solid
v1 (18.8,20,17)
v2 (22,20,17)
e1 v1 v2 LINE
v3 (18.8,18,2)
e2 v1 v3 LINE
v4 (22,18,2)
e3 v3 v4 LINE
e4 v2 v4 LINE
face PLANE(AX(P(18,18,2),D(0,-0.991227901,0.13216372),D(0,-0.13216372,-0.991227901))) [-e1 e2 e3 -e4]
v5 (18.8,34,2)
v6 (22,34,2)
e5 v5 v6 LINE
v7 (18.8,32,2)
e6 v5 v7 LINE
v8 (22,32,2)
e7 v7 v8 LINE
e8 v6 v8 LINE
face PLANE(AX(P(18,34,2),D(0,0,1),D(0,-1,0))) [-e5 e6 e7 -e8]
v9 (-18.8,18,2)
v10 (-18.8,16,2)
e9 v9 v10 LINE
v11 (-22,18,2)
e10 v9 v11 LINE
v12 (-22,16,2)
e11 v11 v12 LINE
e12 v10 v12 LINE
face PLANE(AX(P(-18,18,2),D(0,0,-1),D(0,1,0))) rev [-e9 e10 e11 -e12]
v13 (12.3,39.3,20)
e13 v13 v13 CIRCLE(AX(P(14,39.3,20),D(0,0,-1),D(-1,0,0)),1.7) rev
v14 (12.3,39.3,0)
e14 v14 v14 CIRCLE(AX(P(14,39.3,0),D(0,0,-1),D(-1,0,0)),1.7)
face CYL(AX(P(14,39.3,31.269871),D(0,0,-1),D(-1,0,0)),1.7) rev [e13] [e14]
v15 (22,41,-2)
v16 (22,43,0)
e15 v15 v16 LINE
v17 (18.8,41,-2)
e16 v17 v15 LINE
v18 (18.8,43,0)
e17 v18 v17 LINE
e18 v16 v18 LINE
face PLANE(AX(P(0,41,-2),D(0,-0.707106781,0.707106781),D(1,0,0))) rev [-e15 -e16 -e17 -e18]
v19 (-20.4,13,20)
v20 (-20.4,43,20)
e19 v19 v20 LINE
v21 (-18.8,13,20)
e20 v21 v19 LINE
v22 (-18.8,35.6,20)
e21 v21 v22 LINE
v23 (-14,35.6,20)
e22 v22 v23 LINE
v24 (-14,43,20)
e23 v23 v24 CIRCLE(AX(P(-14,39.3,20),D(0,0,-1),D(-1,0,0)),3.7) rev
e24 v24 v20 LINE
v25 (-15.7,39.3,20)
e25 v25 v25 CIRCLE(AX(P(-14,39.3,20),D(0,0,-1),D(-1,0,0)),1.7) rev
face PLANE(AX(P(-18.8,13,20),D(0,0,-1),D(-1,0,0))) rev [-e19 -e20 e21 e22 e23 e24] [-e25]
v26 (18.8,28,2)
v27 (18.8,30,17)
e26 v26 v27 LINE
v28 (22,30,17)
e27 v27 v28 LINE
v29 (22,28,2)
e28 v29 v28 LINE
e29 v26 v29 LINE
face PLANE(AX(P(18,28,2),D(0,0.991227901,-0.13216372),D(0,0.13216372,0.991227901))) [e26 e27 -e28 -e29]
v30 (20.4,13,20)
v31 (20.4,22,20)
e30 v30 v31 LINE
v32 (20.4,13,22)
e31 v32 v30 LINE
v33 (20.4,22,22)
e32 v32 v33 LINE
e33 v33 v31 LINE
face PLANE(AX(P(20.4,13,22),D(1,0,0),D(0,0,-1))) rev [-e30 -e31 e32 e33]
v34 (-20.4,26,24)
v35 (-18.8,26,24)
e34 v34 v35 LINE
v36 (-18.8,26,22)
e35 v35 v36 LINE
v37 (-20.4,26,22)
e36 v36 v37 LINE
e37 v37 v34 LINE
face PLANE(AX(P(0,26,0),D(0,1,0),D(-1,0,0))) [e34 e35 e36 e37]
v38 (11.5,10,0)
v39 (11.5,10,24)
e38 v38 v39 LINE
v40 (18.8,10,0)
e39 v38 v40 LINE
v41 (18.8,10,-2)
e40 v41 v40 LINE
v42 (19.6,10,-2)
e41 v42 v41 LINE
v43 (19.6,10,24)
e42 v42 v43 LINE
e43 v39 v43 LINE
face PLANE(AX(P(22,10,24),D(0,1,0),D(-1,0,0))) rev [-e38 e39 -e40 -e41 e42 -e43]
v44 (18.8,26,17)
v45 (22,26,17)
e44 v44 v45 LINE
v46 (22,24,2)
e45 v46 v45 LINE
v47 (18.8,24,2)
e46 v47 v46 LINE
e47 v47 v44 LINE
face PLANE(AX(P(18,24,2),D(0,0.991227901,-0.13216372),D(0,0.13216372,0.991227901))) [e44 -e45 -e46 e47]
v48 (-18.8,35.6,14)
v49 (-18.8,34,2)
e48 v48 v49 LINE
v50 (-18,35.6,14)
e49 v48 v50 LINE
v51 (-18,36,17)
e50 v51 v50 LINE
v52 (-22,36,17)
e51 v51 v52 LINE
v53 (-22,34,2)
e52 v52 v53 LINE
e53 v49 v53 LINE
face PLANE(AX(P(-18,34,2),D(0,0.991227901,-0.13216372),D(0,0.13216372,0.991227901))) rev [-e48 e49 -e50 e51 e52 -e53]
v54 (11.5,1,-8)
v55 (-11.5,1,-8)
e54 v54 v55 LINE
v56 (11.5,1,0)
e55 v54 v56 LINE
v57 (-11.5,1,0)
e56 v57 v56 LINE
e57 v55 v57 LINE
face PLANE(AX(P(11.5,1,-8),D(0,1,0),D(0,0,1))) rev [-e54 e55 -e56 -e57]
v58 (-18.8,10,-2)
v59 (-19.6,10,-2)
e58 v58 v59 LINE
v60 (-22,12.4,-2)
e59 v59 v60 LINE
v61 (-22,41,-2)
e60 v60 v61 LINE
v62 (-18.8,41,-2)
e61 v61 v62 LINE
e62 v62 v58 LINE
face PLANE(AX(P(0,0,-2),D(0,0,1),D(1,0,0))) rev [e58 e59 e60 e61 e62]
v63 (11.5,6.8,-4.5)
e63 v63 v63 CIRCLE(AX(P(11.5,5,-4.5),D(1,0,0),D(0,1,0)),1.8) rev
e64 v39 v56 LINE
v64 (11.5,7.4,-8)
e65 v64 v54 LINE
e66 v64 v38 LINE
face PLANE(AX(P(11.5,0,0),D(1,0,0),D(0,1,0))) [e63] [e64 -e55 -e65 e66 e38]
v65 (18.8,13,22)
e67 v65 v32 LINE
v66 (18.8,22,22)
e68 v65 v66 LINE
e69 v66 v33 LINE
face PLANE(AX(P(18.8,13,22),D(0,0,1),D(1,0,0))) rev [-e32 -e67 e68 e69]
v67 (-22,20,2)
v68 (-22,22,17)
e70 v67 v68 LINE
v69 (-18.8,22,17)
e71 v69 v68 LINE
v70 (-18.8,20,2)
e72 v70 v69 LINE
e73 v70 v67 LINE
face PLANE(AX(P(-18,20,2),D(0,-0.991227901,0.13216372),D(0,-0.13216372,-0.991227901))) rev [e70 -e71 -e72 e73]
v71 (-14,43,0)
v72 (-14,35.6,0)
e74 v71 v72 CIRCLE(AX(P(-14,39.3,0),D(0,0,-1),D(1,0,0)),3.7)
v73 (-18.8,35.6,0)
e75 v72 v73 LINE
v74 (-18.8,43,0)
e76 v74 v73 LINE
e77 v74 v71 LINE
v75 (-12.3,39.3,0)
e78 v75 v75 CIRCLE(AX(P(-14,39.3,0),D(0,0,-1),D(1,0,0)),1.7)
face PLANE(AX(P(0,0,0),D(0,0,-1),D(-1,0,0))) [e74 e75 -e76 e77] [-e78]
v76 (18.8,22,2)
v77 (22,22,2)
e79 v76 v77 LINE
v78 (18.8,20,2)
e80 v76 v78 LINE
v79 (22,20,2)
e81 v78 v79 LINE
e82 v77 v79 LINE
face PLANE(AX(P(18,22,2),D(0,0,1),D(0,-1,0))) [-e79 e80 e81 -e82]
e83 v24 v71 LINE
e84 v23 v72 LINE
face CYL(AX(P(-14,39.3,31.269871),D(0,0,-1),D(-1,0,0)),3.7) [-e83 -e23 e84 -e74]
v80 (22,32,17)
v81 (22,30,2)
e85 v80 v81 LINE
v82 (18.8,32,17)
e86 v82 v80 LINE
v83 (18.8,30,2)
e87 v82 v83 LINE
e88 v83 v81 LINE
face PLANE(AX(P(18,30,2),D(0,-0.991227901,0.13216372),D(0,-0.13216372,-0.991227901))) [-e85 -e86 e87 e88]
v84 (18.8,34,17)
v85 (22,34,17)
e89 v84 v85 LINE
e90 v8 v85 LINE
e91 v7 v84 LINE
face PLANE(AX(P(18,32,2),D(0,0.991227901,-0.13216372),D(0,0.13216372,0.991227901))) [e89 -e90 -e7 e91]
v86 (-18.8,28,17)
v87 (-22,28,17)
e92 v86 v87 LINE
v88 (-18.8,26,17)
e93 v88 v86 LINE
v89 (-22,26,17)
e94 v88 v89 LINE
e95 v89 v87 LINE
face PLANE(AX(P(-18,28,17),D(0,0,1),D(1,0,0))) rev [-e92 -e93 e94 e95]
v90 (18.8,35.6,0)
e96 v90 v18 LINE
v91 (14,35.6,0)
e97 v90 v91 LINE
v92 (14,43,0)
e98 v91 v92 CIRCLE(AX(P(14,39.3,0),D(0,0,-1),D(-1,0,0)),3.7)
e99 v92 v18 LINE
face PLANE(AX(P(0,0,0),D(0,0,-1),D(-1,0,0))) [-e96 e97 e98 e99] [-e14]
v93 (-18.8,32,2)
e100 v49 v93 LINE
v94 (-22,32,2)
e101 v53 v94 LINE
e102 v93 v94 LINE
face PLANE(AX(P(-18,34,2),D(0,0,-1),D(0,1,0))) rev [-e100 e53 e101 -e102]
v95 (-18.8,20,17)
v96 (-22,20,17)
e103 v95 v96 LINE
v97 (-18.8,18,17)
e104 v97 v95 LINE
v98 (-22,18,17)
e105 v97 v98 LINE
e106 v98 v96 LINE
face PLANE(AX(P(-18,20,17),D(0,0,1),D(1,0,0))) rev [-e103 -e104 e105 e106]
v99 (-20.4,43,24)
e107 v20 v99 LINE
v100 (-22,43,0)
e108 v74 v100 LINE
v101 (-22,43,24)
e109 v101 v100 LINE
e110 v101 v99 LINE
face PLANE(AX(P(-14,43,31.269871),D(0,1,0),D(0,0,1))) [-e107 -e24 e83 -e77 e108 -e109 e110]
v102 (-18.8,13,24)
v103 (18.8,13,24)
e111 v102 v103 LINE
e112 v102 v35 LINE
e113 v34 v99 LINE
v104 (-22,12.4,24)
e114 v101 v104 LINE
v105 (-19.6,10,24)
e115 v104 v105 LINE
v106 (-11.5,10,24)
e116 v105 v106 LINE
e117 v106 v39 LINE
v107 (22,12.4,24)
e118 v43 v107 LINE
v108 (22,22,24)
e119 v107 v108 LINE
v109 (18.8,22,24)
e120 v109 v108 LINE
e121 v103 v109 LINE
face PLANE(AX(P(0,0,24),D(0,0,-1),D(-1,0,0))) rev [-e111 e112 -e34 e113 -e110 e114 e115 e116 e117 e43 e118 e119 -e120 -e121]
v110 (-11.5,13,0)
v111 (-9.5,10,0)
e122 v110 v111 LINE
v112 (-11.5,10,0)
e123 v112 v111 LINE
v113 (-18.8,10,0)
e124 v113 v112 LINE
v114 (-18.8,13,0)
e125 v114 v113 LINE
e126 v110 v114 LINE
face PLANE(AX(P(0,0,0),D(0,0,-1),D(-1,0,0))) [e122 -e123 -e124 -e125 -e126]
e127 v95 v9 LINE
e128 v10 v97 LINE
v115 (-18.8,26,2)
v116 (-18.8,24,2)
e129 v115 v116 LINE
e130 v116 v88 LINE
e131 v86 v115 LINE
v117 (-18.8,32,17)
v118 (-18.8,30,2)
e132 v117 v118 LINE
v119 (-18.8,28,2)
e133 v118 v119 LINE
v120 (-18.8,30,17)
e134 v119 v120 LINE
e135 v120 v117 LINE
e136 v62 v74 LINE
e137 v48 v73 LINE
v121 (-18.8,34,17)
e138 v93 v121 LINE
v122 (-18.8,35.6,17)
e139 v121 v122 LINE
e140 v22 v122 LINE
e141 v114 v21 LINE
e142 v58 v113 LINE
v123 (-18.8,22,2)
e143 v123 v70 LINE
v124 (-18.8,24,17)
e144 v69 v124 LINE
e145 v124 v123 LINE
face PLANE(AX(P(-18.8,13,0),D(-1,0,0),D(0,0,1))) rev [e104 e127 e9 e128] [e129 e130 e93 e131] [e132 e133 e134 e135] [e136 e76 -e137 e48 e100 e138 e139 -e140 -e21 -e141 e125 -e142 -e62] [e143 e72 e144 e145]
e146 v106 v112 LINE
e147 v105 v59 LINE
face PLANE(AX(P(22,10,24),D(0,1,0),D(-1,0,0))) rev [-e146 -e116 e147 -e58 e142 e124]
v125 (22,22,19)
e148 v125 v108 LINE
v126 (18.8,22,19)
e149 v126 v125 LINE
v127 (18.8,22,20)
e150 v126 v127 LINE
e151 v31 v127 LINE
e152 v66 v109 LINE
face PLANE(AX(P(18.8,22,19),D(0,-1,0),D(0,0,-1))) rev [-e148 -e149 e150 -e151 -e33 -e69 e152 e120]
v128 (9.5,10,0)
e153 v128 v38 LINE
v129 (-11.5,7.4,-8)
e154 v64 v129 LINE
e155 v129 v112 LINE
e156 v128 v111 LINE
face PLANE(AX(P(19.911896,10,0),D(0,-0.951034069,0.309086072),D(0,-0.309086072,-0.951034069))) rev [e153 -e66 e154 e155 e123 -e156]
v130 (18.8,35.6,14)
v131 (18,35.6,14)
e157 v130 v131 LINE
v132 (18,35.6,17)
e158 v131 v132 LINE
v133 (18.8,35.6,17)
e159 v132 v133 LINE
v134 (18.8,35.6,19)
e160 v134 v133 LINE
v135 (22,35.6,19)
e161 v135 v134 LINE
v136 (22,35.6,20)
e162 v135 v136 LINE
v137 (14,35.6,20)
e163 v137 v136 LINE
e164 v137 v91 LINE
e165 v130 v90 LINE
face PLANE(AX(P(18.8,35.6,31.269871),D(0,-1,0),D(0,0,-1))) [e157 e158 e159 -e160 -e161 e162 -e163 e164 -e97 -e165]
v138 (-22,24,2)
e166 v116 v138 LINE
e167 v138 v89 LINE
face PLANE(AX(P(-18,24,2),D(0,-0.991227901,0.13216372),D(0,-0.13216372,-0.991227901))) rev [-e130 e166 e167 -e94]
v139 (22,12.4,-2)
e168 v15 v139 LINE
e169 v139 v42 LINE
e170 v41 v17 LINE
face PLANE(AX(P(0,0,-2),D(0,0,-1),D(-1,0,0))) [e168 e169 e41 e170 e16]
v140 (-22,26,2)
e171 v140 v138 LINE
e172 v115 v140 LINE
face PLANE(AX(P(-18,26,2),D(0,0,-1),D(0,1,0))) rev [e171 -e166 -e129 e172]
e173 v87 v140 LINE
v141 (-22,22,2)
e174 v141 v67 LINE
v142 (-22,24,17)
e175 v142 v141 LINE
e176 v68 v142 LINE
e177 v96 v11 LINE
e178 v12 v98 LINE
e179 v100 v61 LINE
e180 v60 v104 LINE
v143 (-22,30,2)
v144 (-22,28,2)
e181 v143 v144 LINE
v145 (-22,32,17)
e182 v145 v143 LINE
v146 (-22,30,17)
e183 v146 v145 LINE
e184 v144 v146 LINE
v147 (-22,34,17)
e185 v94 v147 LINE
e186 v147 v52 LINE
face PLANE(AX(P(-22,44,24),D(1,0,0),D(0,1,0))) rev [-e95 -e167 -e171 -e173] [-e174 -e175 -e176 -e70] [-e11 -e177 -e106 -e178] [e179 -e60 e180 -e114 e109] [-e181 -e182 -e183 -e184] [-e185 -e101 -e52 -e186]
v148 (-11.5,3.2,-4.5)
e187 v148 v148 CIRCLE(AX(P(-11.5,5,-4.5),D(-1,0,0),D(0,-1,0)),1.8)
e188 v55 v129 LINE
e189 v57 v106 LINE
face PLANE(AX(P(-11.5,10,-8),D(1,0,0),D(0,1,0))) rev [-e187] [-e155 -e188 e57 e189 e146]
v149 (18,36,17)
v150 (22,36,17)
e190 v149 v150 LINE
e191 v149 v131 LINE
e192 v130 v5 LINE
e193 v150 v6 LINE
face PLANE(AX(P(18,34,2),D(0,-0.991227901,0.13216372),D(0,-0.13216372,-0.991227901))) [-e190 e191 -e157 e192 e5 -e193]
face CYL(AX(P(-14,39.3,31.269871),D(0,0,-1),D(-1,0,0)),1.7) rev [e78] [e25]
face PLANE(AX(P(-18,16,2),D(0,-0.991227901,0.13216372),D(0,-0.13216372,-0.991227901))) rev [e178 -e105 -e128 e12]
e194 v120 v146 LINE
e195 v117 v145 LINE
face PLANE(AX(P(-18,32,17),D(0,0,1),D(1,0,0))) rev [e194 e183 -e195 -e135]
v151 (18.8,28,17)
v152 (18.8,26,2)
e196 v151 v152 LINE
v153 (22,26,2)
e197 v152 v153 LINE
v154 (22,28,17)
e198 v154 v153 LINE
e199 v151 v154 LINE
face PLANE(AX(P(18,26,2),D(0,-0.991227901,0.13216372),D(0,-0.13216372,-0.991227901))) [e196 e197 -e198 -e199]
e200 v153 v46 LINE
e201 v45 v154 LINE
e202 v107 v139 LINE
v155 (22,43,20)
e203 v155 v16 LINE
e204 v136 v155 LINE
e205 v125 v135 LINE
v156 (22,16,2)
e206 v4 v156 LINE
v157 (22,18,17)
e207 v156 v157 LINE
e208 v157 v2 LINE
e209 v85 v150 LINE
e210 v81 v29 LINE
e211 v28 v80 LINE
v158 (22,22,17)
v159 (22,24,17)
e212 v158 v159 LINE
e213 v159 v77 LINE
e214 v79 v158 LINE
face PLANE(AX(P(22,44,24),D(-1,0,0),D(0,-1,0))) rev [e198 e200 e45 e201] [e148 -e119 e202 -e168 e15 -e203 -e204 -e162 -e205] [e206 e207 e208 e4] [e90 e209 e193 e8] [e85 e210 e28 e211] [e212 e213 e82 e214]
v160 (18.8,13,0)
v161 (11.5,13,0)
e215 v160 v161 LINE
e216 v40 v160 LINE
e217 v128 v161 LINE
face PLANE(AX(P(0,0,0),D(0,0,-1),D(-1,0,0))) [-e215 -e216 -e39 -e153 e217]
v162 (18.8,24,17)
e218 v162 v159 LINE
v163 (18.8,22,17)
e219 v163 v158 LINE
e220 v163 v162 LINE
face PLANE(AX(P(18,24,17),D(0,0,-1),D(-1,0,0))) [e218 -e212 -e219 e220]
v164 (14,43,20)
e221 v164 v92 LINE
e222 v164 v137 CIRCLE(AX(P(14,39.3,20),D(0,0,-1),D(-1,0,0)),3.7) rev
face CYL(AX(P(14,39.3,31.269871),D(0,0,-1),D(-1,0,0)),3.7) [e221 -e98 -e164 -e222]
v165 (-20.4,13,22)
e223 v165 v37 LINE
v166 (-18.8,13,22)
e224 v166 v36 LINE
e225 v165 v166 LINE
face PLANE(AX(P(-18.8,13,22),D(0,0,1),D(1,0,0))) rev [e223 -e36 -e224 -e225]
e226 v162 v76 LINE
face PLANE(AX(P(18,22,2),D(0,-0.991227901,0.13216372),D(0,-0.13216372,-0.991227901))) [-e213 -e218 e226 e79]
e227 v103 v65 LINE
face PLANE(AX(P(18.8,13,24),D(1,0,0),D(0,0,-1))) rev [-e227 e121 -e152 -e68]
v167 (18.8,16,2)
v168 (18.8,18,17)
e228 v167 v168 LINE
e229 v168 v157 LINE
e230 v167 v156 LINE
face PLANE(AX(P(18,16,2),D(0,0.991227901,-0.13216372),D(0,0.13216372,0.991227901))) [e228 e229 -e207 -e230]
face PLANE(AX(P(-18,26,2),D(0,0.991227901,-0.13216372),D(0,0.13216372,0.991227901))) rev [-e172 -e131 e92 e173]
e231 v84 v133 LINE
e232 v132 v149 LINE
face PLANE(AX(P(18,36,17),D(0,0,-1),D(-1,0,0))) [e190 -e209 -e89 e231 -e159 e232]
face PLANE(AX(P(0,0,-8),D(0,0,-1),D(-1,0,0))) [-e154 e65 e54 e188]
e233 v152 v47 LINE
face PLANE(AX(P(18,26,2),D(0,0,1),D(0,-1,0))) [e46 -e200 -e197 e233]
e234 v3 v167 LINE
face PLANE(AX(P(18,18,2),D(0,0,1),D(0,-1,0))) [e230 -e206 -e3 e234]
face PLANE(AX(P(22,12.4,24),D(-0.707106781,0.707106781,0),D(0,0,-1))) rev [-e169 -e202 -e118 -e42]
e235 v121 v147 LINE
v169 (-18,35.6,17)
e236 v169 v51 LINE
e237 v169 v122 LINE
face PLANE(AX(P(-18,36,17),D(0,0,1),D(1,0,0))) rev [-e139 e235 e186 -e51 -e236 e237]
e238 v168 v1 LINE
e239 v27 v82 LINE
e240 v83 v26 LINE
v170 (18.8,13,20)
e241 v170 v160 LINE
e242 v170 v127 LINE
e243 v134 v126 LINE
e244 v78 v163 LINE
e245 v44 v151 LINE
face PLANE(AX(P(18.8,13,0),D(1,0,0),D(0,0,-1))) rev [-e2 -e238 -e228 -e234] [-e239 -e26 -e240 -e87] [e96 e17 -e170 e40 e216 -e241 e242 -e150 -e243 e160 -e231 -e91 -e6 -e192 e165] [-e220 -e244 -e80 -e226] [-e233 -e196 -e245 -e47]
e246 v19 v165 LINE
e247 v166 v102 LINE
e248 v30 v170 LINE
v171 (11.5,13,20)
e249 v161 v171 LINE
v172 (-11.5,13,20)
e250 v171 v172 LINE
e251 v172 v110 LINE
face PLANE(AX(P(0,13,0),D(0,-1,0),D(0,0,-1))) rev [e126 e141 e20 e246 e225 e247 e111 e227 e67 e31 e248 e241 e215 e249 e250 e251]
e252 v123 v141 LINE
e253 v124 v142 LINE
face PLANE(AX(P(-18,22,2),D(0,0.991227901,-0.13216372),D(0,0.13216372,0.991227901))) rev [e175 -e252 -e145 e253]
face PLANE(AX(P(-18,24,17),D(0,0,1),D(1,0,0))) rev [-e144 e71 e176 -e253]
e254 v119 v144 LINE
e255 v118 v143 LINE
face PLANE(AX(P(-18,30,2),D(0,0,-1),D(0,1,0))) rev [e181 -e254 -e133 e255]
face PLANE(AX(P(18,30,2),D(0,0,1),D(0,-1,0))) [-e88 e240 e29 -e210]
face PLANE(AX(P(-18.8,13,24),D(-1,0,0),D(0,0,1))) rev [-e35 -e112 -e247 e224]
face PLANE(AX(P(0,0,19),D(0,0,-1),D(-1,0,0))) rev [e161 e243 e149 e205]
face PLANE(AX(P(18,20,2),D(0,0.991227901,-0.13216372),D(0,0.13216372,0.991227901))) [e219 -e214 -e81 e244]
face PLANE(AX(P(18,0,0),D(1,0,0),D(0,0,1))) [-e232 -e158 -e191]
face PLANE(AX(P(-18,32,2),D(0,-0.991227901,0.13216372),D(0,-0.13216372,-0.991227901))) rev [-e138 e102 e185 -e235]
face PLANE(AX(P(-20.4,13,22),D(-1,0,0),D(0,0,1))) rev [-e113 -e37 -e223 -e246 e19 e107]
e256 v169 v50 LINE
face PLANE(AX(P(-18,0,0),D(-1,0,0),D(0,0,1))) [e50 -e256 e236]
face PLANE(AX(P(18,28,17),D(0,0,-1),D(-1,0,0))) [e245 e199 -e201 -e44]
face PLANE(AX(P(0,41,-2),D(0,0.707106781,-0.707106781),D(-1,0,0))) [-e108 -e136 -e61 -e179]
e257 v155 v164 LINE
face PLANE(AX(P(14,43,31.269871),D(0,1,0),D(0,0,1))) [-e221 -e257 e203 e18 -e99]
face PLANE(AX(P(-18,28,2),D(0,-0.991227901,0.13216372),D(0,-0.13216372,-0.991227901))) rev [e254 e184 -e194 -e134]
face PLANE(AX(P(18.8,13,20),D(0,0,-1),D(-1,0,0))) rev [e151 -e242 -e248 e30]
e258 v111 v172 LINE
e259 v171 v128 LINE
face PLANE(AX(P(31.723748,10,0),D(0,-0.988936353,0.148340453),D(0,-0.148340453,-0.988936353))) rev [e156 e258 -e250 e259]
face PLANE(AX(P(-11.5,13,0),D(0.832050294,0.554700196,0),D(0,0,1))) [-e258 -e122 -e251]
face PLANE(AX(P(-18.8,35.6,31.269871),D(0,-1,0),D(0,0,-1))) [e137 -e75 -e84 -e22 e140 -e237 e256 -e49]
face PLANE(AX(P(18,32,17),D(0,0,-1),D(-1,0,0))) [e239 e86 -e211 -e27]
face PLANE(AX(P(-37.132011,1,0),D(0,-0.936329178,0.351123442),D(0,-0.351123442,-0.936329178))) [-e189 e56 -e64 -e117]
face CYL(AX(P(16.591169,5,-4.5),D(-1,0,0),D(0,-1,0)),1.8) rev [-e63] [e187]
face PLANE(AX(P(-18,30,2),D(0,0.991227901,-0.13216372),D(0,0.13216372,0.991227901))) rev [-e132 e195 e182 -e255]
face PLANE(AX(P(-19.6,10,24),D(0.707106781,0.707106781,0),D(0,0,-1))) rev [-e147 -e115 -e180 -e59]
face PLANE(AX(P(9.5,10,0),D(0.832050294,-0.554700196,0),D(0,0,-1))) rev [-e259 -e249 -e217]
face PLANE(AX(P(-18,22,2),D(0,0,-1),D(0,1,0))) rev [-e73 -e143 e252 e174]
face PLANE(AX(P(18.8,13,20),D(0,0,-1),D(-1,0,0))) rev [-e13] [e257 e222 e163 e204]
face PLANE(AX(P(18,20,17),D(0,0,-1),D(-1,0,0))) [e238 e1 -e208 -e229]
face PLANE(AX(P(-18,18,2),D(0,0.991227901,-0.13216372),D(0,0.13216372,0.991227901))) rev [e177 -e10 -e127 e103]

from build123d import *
from OCP.BRepFilletAPI import BRepFilletAPI_MakeChamfer

# Parameters (mm, degrees)
SKETCH_1_W           = 44
SKETCH_1_H           = 34
EXTRUDE_1_DEPTH      = 24
CUT_EXTRUDE_1_DEPTH  = 31
SKETCH_5_W           = 23
SKETCH_5_H           = 9
EXTRUDE_4_DEPTH      = 8
EXTRUDE_5_DEPTH      = 23
SKETCH_7_R           = 1.8
CUT_EXTRUDE_2_DEPTH  = 23
CUT_EXTRUDE_4_DEPTH  = 19
CUT_EXTRUDE_6_REACH  = 62.285
CHAMFER_2_SIZE       = 2
CHAMFER_2_SIZE_2     = 3
SKETCH_11_R          = 1.7
EXTRUDE_6_DEPTH      = 20
CUT_EXTRUDE_7_DEPTH  = 4
CHAMFER_3_SIZE       = 2.4
SKETCH_14_W          = 40.8
SKETCH_14_H          = 4
CUT_EXTRUDE_8_DEPTH  = 18
SKETCH_15_W          = 44
SKETCH_15_H          = 1
CUT_EXTRUDE_9_DEPTH  = 24
SKETCH_16_W          = 3.2
SKETCH_16_H          = 13.6
CUT_EXTRUDE_10_DEPTH = 5
SKETCH_17_W          = 1.6
SKETCH_17_H          = 4
CUT_EXTRUDE_11_DEPTH = 7.4
EXTRUDE_7_DEPTH      = 2
CHAMFER_4_SIZE       = 2


with BuildPart() as part:
    # Эскиз1 → Бобышка-Вытянуть1 (new body)
    with BuildSketch(Plane.XY):
        with Locations((0, 27)):
            Rectangle(SKETCH_1_W, SKETCH_1_H)
    extrude(amount=EXTRUDE_1_DEPTH)

    # Эскиз2 → Вырез-Вытянуть1 (cut)
    with BuildSketch(Plane(origin=(0, 44, 0), x_dir=(1, 0, 0), z_dir=(0, 1, 0))):
        Polygon((-18.8, 0), (18.8, 0), (18.8, -20), (20.4, -20), (20.4, -22), (18.8, -22), (18.8, -24), (-18.8, -24), (-18.8, -22), (-20.4, -22), (-20.4, -20), (-18.8, -20), align=None)
    extrude(amount=-CUT_EXTRUDE_1_DEPTH, mode=Mode.SUBTRACT)



with BuildPart() as body_2:
    # Эскиз5 → Бобышка-Вытянуть4 (new body)
    with BuildSketch(Plane(origin=(0, 0, 0), x_dir=(-1, 0, 0), z_dir=(0, 0, -1))):
        with Locations((0, 5.5)):
            Rectangle(SKETCH_5_W, SKETCH_5_H)
    extrude(amount=EXTRUDE_4_DEPTH)


with BuildPart() as part_1:
    add(part.part)

    add(body_2.part)  # Бобышка-Вытянуть5 merges body 2
    # Эскиз6 → Бобышка-Вытянуть5 (add)
    with BuildSketch(Plane(origin=(11.5, 0, 0), x_dir=(0, 0, -1), z_dir=(1, 0, 0))):
        Polygon((0, 1), (-24, 10), (0, 10), align=None)
    extrude(amount=-EXTRUDE_5_DEPTH)

    # Эскиз7 → Вырез-Вытянуть2 (cut)
    with BuildSketch(Plane.ZY.offset(11.5)):
        with Locations(Location((-4.5, 5, 0), (0, 0, 270))):
            Circle(SKETCH_7_R)
    extrude(amount=-CUT_EXTRUDE_2_DEPTH, mode=Mode.SUBTRACT)

    # Эскиз8 → Вырез-Вытянуть4 (cut)
    with BuildSketch(Plane.ZY.offset(9.5)):
        Polygon((0, 10), (20, 13), (0, 13), align=None)
    extrude(amount=-CUT_EXTRUDE_4_DEPTH, mode=Mode.SUBTRACT)

    # Вырез-Вытянуть6: up to this face of the body (flat: up to its plane)
    cut_extrude_6_end = Plane(part_1.part.faces().sort_by_distance((11.5, 6.483913321, 3.661523268))[0])
    # Эскиз9 → Вырез-Вытянуть6 (cut, up to the picked face)
    with BuildSketch(Plane.ZY.offset(11.5), mode=Mode.PRIVATE) as cut_extrude_6_sk1:
        Polygon((0, 10), (-8, 7.4), (-8, 10), align=None)
    cut_extrude_6_tool1 = split(extrude(cut_extrude_6_sk1.sketch, amount=-CUT_EXTRUDE_6_REACH, mode=Mode.PRIVATE), bisect_by=cut_extrude_6_end, keep=Keep.BOTH, mode=Mode.PRIVATE)
    add(cut_extrude_6_tool1.solids().sort_by(Axis((-11.5, 9.133333, -5.333333), (1, 0, 0)))[0], mode=Mode.SUBTRACT)

    # Фаска2
    chamfer_2_edges_1 = [part_1.edges().sort_by_distance(p)[0] for p in [
        (-9.5, 13, 10),
    ]]
    chamfer_2_side_1 = [part_1.faces().sort_by_distance(p)[0] for p in [
        (-9.54, 13, 10),
    ]]
    chamfer_2_edges_2 = [part_1.edges().sort_by_distance(p)[0] for p in [
        (9.5, 13, 10),
    ]]
    chamfer_2_side_2 = [part_1.faces().sort_by_distance(p)[0] for p in [
        (9.5, 12.96, 10),
    ]]
    chamfer_2 = BRepFilletAPI_MakeChamfer(part_1.part.solid().wrapped)
    for e in chamfer_2_edges_1:
        chamfer_2.Add(CHAMFER_2_SIZE - 0.0001, CHAMFER_2_SIZE_2 - 0.0001, e.wrapped, chamfer_2_side_1[0].wrapped)
    for e in chamfer_2_edges_2:
        chamfer_2.Add(CHAMFER_2_SIZE_2 - 0.0001, CHAMFER_2_SIZE - 0.0001, e.wrapped, chamfer_2_side_2[0].wrapped)
    add(Compound.cast(chamfer_2.Shape()), mode=Mode.REPLACE)  # a hair under: the kernel refuses the full size

    # Эскиз11 → Бобышка-Вытянуть6 (add)
    # profile 1 of 2: a face of its own
    with BuildSketch(Plane(origin=(0, 0, 0), x_dir=(-1, 0, 0), z_dir=(0, 0, -1))):
        with BuildLine():
            Line((-14, 43), (-18.8, 43))
            Line((-18.8, 43), (-18.8, 35.6))
            Line((-18.8, 35.6), (-14, 35.6))
            ThreePointArc((-14, 35.6), (-10.3, 39.3), (-14, 43))
        make_face()
        with Locations((-14, 39.3)):
            Circle(SKETCH_11_R, mode=Mode.SUBTRACT)
    # profile 2 of 2: a face of its own
    with BuildSketch(Plane(origin=(0, 0, 0), x_dir=(-1, 0, 0), z_dir=(0, 0, -1))):
        with BuildLine():
            Line((18.8, 35.6), (14, 35.6))
            ThreePointArc((14, 35.6), (10.3, 39.3), (14, 43))
            Line((14, 43), (18.8, 43))
            Line((18.8, 43), (18.8, 35.6))
        make_face()
        with Locations((14, 39.3)):
            Circle(SKETCH_11_R, mode=Mode.SUBTRACT)
    extrude(amount=-EXTRUDE_6_DEPTH)

    # Эскиз13 → Вырез-Вытянуть7 (cut)
    with BuildSketch(Plane.ZY.offset(22)):
        Polygon((2, 34), (17, 36), (17, 34), (2, 32), align=None)
        Polygon((2, 30), (17, 32), (17, 30), (2, 28), align=None)
        Polygon((2, 26), (17, 28), (17, 26), (2, 24), align=None)
        Polygon((2, 22), (17, 24), (17, 22), (2, 20), align=None)
        Polygon((2, 18), (17, 20), (17, 18), (2, 16), align=None)
    cut_extrude_7 = extrude(amount=-CUT_EXTRUDE_7_DEPTH, mode=Mode.SUBTRACT)

    # Зеркальное отражение1: Вырез-Вытянуть7 across plane
    add(cut_extrude_7.mirror(Plane(origin=(0, 0, 0), x_dir=(0, 0, 1), z_dir=(1, 0, 0))), mode=Mode.SUBTRACT)

    # Фаска3
    chamfer_3_edges = [part_1.edges().sort_by_distance(p)[0] for p in [
        (22, 10, 12),
        (-22, 10, 12),
    ]]
    chamfer(chamfer_3_edges, length=CHAMFER_3_SIZE)

    # Эскиз14 → Вырез-Вытянуть8 (cut)
    with BuildSketch(Plane(origin=(0, 44, 0), x_dir=(1, 0, 0), z_dir=(0, 1, 0))):
        with Locations((0, -22)):
            Rectangle(SKETCH_14_W, SKETCH_14_H)
    extrude(amount=-CUT_EXTRUDE_8_DEPTH, mode=Mode.SUBTRACT)

    # Эскиз15 → Вырез-Вытянуть9 (cut)
    with BuildSketch(Plane(origin=(0, 0, 0), x_dir=(-1, 0, 0), z_dir=(0, 0, -1))):
        with Locations((0, 43.5)):
            Rectangle(SKETCH_15_W, SKETCH_15_H)
    extrude(amount=-CUT_EXTRUDE_9_DEPTH, mode=Mode.SUBTRACT)

    # Эскиз16 → Вырез-Вытянуть10 (cut)
    with BuildSketch(Plane.XY.offset(24)):
        with Locations((20.4, 28.8)):
            Rectangle(SKETCH_16_W, SKETCH_16_H)
    extrude(amount=-CUT_EXTRUDE_10_DEPTH, mode=Mode.SUBTRACT)

    # Эскиз17 → Вырез-Вытянуть11 (cut)
    with BuildSketch(Plane(origin=(0, 43, 0), x_dir=(1, 0, 0), z_dir=(0, 1, 0))):
        with Locations((21.2, -22)):
            Rectangle(SKETCH_17_W, SKETCH_17_H)
    extrude(amount=-CUT_EXTRUDE_11_DEPTH, mode=Mode.SUBTRACT)

    # Эскиз18 → Бобышка-Вытянуть7 (add)
    with BuildSketch(Plane(origin=(0, 0, 0), x_dir=(-1, 0, 0), z_dir=(0, 0, -1))):
        Polygon((-22, 43), (-18.8, 43), (-18.8, 10), (-19.6, 10), (-22, 12.4), align=None)
        Polygon((22, 12.4), (19.6, 10), (18.8, 10), (18.8, 43), (22, 43), align=None)
    extrude(amount=EXTRUDE_7_DEPTH)

    # Фаска4
    chamfer_4_edges = [part_1.edges().sort_by_distance(p)[0] for p in [
        (-20.4, 43, -2),
        (20.4, 43, -2),
    ]]
    chamfer(chamfer_4_edges, length=CHAMFER_4_SIZE)


solid = part_1.part
